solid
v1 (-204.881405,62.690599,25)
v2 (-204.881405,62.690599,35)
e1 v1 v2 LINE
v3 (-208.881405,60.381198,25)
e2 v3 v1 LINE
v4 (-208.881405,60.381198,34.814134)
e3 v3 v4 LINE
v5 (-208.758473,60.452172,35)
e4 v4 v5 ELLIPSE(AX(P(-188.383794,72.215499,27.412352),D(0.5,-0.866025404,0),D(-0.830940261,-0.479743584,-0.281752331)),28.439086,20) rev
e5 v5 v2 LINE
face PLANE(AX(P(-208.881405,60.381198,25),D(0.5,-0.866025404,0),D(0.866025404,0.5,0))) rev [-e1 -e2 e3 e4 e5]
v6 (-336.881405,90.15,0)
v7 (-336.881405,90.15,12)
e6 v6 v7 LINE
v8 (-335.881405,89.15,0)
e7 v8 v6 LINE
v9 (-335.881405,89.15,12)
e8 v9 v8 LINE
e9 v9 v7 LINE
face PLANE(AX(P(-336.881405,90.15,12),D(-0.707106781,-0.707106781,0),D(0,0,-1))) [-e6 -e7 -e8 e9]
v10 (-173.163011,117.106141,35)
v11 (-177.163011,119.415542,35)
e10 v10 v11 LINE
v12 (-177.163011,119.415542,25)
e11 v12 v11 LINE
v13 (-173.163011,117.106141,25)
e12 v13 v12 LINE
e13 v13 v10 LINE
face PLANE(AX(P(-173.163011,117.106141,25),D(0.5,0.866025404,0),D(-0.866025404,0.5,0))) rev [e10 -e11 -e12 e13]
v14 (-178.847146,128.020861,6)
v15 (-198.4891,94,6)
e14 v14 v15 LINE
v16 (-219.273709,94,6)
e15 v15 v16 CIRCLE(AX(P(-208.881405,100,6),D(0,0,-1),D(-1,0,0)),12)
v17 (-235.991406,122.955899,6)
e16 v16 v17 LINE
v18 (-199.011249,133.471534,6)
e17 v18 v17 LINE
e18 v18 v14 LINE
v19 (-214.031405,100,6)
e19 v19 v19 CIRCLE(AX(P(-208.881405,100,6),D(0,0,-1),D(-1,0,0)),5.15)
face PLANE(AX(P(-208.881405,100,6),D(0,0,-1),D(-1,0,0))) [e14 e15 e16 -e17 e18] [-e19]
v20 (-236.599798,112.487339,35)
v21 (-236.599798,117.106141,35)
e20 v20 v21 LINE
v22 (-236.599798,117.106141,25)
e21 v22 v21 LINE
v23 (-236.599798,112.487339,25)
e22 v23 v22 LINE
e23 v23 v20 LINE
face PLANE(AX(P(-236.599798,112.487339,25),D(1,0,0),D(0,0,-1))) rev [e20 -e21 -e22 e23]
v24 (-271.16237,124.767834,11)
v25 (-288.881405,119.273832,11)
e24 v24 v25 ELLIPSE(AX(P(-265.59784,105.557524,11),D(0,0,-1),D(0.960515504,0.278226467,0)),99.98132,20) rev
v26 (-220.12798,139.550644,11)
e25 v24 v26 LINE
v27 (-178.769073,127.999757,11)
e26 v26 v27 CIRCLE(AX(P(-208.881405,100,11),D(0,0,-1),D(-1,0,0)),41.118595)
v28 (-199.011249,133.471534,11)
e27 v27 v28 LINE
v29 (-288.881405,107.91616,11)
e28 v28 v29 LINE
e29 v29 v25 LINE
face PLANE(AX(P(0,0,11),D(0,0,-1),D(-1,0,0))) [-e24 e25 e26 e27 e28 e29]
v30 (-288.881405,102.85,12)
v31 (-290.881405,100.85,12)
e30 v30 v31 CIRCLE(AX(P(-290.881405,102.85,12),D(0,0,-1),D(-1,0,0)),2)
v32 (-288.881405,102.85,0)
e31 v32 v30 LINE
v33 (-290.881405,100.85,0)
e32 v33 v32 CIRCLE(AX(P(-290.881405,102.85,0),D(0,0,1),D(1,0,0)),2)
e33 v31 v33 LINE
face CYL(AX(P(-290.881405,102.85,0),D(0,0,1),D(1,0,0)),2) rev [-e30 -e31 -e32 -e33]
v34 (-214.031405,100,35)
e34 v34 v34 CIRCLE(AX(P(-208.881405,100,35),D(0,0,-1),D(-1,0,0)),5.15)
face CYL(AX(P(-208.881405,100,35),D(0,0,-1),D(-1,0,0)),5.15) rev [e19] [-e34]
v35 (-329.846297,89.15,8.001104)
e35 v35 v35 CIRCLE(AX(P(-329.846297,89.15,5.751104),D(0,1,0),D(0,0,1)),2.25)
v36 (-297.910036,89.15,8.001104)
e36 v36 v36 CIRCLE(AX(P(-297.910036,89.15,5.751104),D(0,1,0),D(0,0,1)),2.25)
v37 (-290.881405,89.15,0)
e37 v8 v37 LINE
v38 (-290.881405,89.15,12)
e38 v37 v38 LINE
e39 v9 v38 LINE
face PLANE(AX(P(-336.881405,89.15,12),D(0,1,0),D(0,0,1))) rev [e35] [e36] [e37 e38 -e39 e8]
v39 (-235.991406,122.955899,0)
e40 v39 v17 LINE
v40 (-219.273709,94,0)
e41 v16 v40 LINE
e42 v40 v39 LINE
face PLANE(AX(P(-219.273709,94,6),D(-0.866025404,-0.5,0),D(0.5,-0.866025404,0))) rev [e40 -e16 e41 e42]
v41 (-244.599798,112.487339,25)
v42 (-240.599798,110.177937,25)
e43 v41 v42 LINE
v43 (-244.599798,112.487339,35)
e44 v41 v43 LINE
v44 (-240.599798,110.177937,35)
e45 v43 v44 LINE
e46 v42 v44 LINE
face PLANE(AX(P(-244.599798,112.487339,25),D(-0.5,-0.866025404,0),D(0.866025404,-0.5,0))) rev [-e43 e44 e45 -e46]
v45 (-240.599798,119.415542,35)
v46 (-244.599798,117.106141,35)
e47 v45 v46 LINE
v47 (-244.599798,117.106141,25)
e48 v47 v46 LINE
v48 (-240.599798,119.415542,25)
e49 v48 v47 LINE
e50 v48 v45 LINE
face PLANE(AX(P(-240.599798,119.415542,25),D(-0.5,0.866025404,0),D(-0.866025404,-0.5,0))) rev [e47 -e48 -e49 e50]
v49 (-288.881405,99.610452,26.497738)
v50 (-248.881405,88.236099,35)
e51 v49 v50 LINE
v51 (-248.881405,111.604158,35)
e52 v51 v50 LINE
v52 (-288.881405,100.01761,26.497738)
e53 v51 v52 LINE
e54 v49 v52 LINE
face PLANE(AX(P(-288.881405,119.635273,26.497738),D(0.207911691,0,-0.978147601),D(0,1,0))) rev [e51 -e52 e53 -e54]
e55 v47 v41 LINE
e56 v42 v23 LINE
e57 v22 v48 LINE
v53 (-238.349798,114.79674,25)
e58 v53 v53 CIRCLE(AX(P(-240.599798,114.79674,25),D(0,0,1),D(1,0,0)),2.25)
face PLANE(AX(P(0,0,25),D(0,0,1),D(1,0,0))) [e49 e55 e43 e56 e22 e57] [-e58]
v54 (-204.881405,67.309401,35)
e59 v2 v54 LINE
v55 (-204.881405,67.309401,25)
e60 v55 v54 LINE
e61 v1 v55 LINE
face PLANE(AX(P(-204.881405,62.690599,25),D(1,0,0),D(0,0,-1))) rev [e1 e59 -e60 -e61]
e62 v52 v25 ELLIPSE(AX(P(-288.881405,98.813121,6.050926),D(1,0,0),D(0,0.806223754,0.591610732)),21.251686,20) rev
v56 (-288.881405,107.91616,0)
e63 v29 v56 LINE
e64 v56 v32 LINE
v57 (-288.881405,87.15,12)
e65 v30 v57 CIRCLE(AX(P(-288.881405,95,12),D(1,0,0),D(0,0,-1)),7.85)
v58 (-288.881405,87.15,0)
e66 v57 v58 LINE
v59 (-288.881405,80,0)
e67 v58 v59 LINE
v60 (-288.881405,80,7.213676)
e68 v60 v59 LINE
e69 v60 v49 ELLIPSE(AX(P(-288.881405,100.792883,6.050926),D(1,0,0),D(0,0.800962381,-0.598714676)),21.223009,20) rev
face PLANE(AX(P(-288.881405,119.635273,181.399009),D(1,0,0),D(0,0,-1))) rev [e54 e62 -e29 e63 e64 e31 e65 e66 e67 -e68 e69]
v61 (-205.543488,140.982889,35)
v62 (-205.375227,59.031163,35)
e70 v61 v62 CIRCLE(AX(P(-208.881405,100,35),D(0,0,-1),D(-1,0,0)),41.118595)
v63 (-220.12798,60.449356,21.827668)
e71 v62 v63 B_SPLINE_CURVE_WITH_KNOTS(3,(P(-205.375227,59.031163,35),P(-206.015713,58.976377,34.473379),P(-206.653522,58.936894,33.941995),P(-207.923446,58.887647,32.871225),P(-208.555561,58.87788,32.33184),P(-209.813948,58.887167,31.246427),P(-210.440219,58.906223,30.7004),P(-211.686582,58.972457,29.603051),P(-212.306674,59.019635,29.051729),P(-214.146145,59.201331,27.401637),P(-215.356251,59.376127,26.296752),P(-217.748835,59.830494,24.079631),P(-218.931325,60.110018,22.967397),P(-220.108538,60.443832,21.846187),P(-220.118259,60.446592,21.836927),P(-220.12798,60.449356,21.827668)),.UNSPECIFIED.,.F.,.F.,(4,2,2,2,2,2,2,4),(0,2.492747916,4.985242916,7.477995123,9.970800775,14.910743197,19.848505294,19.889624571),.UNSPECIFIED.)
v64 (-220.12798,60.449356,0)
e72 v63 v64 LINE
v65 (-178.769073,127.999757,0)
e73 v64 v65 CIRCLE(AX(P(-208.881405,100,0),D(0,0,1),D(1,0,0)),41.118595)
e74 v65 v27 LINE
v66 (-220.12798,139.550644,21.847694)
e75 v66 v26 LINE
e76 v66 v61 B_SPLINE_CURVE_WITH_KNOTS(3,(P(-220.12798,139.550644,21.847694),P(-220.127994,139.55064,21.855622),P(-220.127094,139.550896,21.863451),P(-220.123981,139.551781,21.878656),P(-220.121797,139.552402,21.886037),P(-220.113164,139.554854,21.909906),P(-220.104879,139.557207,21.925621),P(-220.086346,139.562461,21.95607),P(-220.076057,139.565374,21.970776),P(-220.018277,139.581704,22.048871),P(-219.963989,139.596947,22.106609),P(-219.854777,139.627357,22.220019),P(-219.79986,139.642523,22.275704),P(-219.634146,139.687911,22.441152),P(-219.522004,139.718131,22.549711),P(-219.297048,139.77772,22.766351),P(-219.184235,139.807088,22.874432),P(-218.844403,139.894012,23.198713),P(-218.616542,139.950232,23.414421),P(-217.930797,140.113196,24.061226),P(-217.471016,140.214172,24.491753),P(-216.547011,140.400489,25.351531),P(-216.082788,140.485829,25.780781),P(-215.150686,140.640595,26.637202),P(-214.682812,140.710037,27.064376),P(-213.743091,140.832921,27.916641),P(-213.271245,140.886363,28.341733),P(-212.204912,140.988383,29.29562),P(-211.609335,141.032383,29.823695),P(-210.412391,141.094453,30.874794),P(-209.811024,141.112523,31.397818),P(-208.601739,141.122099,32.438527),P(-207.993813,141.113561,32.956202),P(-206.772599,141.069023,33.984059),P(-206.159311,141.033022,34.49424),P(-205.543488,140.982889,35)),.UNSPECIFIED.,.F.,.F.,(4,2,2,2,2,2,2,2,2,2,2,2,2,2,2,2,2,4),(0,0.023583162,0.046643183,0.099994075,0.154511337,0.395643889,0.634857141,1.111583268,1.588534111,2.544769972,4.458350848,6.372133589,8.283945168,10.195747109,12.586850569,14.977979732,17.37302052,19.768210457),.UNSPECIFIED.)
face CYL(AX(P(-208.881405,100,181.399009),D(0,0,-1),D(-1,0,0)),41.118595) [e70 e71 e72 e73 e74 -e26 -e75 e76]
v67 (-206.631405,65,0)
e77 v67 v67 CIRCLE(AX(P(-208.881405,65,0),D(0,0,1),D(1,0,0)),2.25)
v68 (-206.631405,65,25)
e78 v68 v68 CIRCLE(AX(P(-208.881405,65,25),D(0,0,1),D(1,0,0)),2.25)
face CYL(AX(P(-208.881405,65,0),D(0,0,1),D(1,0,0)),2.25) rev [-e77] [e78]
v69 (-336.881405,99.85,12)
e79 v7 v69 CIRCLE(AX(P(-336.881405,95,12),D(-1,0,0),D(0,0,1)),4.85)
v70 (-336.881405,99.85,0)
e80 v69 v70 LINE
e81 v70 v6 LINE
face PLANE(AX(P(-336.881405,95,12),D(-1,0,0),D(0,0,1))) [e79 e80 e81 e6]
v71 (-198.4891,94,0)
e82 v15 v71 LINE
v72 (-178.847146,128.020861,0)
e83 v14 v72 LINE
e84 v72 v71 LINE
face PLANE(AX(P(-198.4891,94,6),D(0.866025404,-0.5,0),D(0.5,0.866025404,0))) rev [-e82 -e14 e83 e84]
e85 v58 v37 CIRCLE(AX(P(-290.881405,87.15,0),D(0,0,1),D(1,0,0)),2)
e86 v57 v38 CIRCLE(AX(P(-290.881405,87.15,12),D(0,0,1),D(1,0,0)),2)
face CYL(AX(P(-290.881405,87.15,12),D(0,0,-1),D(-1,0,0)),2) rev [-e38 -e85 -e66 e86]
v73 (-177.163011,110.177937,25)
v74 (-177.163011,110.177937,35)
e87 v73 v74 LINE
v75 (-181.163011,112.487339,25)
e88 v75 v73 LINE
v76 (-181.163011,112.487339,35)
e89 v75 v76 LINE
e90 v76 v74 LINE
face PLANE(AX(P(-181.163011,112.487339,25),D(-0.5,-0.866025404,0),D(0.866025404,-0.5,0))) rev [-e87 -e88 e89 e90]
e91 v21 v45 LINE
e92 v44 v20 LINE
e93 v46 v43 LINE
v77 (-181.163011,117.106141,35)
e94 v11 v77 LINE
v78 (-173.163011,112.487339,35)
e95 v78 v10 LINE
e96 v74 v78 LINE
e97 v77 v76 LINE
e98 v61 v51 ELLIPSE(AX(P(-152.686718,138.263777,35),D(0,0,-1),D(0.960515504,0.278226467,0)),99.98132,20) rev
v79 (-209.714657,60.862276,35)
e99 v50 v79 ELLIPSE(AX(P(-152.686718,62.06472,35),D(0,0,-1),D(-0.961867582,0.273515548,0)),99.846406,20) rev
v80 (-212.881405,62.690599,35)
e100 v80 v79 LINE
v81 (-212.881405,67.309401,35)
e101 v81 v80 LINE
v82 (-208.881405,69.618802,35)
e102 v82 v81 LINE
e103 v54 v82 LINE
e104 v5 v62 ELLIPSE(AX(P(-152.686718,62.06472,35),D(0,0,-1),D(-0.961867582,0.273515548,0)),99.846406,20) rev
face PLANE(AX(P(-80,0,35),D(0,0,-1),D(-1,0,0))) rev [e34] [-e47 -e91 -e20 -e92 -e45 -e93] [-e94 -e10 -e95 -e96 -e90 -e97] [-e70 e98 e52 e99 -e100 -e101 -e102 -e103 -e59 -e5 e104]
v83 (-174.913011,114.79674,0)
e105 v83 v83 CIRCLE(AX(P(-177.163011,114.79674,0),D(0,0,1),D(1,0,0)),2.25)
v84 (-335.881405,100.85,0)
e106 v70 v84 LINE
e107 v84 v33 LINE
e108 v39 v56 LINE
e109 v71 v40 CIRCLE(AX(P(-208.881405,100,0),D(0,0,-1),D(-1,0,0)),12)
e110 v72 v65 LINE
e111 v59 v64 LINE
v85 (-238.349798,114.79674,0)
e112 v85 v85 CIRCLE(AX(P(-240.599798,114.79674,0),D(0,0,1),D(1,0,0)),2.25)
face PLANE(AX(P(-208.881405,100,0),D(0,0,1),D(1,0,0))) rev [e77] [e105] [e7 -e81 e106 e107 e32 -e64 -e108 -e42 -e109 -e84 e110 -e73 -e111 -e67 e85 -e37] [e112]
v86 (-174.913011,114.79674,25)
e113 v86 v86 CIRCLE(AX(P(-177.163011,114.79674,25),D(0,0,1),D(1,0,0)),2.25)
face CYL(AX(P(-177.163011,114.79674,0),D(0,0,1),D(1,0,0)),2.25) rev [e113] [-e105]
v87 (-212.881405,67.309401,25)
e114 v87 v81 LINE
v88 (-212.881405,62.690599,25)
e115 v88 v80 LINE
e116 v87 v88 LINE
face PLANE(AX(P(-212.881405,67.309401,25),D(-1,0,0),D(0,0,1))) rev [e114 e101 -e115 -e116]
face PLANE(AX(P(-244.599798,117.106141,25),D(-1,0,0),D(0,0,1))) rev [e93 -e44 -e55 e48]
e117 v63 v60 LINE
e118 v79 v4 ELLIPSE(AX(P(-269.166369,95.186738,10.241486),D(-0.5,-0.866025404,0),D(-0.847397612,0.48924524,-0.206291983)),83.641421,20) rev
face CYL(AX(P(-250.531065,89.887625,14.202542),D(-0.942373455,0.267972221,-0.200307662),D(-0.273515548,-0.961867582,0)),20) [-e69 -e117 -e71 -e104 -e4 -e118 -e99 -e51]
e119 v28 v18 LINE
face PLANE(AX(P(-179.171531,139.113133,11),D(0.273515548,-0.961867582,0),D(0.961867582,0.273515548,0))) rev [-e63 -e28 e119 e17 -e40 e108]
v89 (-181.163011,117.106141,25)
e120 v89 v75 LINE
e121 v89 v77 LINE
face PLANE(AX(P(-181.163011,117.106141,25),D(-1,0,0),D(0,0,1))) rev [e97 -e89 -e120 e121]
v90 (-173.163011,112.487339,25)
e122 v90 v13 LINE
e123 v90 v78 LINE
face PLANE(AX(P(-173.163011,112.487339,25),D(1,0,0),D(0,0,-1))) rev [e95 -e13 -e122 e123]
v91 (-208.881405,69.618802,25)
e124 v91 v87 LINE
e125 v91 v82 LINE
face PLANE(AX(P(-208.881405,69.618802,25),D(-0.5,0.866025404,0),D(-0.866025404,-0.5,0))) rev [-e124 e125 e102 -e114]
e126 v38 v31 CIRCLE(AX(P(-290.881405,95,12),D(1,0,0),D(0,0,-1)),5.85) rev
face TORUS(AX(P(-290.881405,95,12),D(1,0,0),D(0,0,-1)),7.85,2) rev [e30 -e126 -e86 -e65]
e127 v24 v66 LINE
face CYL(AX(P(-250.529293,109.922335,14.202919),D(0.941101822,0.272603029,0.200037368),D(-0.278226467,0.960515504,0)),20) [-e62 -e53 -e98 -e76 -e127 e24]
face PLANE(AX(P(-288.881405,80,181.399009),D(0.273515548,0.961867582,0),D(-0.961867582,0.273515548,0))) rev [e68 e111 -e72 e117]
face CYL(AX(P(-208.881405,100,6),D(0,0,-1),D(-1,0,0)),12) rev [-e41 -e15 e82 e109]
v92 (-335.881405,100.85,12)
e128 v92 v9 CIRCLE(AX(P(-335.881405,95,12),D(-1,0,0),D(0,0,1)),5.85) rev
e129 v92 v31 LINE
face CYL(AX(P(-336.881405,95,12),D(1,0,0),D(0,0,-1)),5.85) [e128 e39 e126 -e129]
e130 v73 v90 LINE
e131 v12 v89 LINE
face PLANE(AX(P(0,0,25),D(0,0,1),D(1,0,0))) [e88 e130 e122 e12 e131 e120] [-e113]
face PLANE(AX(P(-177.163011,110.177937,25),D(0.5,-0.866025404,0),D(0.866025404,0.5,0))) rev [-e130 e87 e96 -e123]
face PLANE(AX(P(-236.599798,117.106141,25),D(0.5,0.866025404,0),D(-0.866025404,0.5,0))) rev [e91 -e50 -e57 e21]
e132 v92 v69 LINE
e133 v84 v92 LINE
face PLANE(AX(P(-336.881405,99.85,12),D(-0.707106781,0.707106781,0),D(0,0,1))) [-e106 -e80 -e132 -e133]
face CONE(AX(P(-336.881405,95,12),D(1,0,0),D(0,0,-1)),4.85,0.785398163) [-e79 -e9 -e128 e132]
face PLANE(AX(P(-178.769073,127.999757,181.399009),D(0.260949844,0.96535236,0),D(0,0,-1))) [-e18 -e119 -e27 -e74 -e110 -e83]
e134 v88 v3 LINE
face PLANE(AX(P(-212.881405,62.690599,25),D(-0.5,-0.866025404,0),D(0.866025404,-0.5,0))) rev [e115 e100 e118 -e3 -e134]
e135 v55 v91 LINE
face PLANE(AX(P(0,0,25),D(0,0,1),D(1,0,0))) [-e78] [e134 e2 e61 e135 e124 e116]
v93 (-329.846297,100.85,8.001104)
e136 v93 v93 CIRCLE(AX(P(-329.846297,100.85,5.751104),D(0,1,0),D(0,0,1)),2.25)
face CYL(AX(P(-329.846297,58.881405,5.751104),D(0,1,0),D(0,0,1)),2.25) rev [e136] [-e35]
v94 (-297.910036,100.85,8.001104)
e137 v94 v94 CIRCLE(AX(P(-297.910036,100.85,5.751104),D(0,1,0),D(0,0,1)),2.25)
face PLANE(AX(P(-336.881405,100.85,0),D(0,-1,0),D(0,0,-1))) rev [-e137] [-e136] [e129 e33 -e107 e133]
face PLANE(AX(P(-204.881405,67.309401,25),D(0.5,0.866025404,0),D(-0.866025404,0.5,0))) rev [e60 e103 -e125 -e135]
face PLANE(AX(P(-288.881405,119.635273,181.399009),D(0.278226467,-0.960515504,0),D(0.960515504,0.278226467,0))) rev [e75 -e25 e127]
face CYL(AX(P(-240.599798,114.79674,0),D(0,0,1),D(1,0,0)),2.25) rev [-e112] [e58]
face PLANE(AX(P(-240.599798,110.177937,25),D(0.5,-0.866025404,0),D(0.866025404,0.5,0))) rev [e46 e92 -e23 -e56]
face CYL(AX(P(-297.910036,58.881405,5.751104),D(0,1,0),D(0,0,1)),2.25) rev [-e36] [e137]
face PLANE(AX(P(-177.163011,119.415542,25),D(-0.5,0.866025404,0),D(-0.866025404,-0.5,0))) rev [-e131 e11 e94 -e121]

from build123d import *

# Parameters (mm, degrees)
RESSALTO_EXTRUS_O1_DEPTH = 35
CHANFRO1_SIZE            = 40
CHANFRO1_SIZE2           = 8.502262467
FILETE2_R                = 20
CORTE_EXTRUS_O2_DEPTH    = 6
CORTE_EXTRUS_O3_DEPTH    = 11
CHANFRO2_SIZE            = 10
RESSALTO_EXTRUS_O2_DEPTH = 48
CHANFRO3_SIZE            = 1
FILETE3_R                = 2
ESBO_O9_R                = 2.25
CORTE_EXTRUS_O4_DEPTH    = 342.284989024
ESBO_O10_R               = 5.15
CORTE_EXTRUS_O5_DEPTH    = 367.917618461
CORTE_EXTRUS_O7_DEPTH    = 10
ESBO_O13_R               = 2.25
CORTE_EXTRUS_O8_DEPTH    = 367.09908322


with BuildPart() as part:
    # Esboço1 → Ressalto-extrusão1 (new body)
    with BuildSketch(Plane.XY):
        with BuildLine():
            Line((-288.88140452, 80), (-220.127979697, 60.449355997))
            ThreePointArc((-220.127979697, 60.449355997), (-167.76280904, 100), (-220.127979697, 139.550644003))
            Line((-220.127979697, 139.550644003), (-288.88140452, 119.635273108))
            Line((-288.88140452, 119.635273108), (-288.88140452, 80))
        make_face()
    extrude(amount=RESSALTO_EXTRUS_O1_DEPTH)

    # Chanfro1
    chanfro1_edges = [part.edges().sort_by_distance(p)[0] for p in [
        (-288.88140452, 99.817636554, 35),
    ]]
    chanfro1_side = [part.faces().sort_by_distance(p)[0] for p in [
        (-225.798931966, 99.956743446, 35),
    ]]
    chamfer(chanfro1_edges, length=CHANFRO1_SIZE, length2=CHANFRO1_SIZE2, reference=chanfro1_side[0])

    # Filete2
    # the kernel refuses this fillet: 20 mm, written as the material it takes off along each edge
    with BuildSketch(Plane(origin=(-115.658970437, 169.81152296, 63.317302526), x_dir=(0.19213899287120792, 0.055655690116350805, -0.9797882687479528), z_dir=(-0.9411018224853822, -0.27260302876307696, -0.2000373675688854))) as filete2_piece_1:
        with BuildLine():
            CenterArc((FILETE2_R * 0.943733759019, FILETE2_R), FILETE2_R, 183.31621355, 86.68378645)
            Line((-FILETE2_R * 0.054591728164, FILETE2_R * 0.942153464743), (0, 0))
            Line((0, 0), (FILETE2_R * 0.943733759019, 0))
        make_face()
    extrude(amount=231.2501229, mode=Mode.SUBTRACT)
    with BuildSketch(Plane(origin=(-115.347800558, 30.654185994, 63.383443726), x_dir=(0.2621163849534368, 0.9634266390424966, 0.05571455754307817), z_dir=(-0.9423734554624519, 0.2679722209171675, -0.2003076615021976))) as filete2_piece_2:
        with BuildLine():
            CenterArc((FILETE2_R * 0.9446616108, FILETE2_R), FILETE2_R, 183.260002361, 86.739997639)
            Line((-FILETE2_R * 0.0537201474496, FILETE2_R * 0.943132919942), (0, 0))
            Line((0, 0), (FILETE2_R * 0.9446616108, 0))
        make_face()
    extrude(amount=231.378339467, mode=Mode.SUBTRACT)

    # Esboço6 → Corte-extrusão2 (cut)
    with BuildSketch(Plane(origin=(0, 0, 0), x_dir=(-1, 0, 0), z_dir=(0, 0, -1))):
        with BuildLine():
            Line((219.273709365, 94), (245.2234198, 138.946216915))
            Line((245.2234198, 138.946216915), (172.539389239, 138.946216915))
            Line((172.539389239, 138.946216915), (198.489099675, 94))
            ThreePointArc((198.489099675, 94), (208.88140452, 88), (219.273709365, 94))
        make_face()
    extrude(amount=-CORTE_EXTRUS_O2_DEPTH, mode=Mode.SUBTRACT)

    # Esboço7 → Corte-extrusão3 (cut)
    with BuildSketch(Plane(origin=(0, 0, 0), x_dir=(-1, 0, 0), z_dir=(0, 0, -1))):
        Polygon((179.171530951, 139.11313265), (295.618088129, 106.000524942), (295.618088129, 136.423544796), (188.948158446, 165.308096575), align=None)
    extrude(amount=-CORTE_EXTRUS_O3_DEPTH, mode=Mode.SUBTRACT)

    # Chanfro2
    # the kernel refuses this chamfer: 22.612495948, 10 mm, written as the material it takes off along each edge
    with BuildSketch(Plane(origin=(-189.392572811, 136.206689062, 11), x_dir=(0.7913619734687217, -0.6113478771924299, 0), z_dir=(0, 0, -1))) as chanfro2_piece_1:
        with BuildLine():
            Line((13.424324353, 0), (-CHANFRO2_SIZE * 0.593972278099, CHANFRO2_SIZE * 0.804485508167))
            Line((-CHANFRO2_SIZE * 0.593972278099, CHANFRO2_SIZE * 0.804485508167), (0, 0))
            ThreePointArc((0, 0), (7.133656498, -0.549382314), (13.424324353, 0))
        make_face()
    extrude(amount=40.659571502, mode=Mode.SUBTRACT)

    # Esboço8 → Ressalto-extrusão2 (add)
    with BuildSketch(Plane.ZY.offset(288.88140452)):
        with BuildLine():
            Line((0, 100.85), (12, 100.85))
            ThreePointArc((12, 100.85), (17.85, 95), (12, 89.15))
            Line((12, 89.15), (0, 89.15))
            Line((0, 89.15), (0, 100.85))
        make_face()
    extrude(amount=RESSALTO_EXTRUS_O2_DEPTH)

    # Chanfro3
    chanfro3_edges = [part.edges().sort_by_distance(p)[0] for p in [
        (-336.88140452, 89.15, 6),
        (-336.88140452, 95, 17.85),
        (-336.88140452, 100.85, 6),
    ]]
    chamfer(chanfro3_edges, length=CHANFRO3_SIZE)

    # Filete3
    filete3_edges = [part.edges().sort_by_distance(p)[0] for p in [
        (-288.88140452, 89.15, 6),
        (-288.88140452, 95, 17.85),
        (-288.88140452, 100.85, 6),
    ]]
    fillet(filete3_edges, radius=FILETE3_R)

    # Esboço9 → Corte-extrusão4 (cut, through all)
    with BuildSketch(Plane(origin=(0, 100.85, 0), x_dir=(1, 0, 0), z_dir=(0, 1, 0))):
        with Locations(Location((-329.846296891, -5.75110431, 0), (0, 0, 270))):
            Circle(ESBO_O9_R)
        with Locations(Location((-297.910035946, -5.75110431, 0), (0, 0, 270))):
            Circle(ESBO_O9_R)
    extrude(amount=-CORTE_EXTRUS_O4_DEPTH, mode=Mode.SUBTRACT)

    # Esboço10 → Corte-extrusão5 (cut, through all)
    with BuildSketch(Plane(origin=(0, 0, 0), x_dir=(-1, 0, 0), z_dir=(0, 0, -1))):
        with Locations((208.88140452, 100)):
            Circle(ESBO_O10_R)
    extrude(amount=-CORTE_EXTRUS_O5_DEPTH, mode=Mode.SUBTRACT)

    # Esboço12 → Corte-extrusão7 (cut)
    with BuildSketch(Plane.XY.offset(35)):
        Polygon((-240.599798192, 119.415541755), (-244.599798192, 117.106140678), (-244.599798192, 112.487338525), (-240.599798192, 110.177937448), (-236.599798192, 112.487338525), (-236.599798192, 117.106140678), align=None)
        Polygon((-208.88140452, 69.618802154), (-212.88140452, 67.309401077), (-212.88140452, 62.690598923), (-208.88140452, 60.381197846), (-204.88140452, 62.690598923), (-204.88140452, 67.309401077), align=None)
        Polygon((-177.163010847, 119.415541755), (-181.163010847, 117.106140678), (-181.163010847, 112.487338525), (-177.163010847, 110.177937448), (-173.163010847, 112.487338525), (-173.163010847, 117.106140678), align=None)
    extrude(amount=-CORTE_EXTRUS_O7_DEPTH, mode=Mode.SUBTRACT)

    # Esboço13 → Corte-extrusão8 (cut, through all)
    with BuildSketch(Plane.XY.offset(25)):
        with Locations((-177.163010847, 114.796739602)):
            Circle(ESBO_O13_R)
        with Locations((-208.88140452, 65)):
            Circle(ESBO_O13_R)
        with Locations((-240.599798192, 114.796739602)):
            Circle(ESBO_O13_R)
    extrude(amount=-CORTE_EXTRUS_O8_DEPTH, mode=Mode.SUBTRACT)


solid = part.part
